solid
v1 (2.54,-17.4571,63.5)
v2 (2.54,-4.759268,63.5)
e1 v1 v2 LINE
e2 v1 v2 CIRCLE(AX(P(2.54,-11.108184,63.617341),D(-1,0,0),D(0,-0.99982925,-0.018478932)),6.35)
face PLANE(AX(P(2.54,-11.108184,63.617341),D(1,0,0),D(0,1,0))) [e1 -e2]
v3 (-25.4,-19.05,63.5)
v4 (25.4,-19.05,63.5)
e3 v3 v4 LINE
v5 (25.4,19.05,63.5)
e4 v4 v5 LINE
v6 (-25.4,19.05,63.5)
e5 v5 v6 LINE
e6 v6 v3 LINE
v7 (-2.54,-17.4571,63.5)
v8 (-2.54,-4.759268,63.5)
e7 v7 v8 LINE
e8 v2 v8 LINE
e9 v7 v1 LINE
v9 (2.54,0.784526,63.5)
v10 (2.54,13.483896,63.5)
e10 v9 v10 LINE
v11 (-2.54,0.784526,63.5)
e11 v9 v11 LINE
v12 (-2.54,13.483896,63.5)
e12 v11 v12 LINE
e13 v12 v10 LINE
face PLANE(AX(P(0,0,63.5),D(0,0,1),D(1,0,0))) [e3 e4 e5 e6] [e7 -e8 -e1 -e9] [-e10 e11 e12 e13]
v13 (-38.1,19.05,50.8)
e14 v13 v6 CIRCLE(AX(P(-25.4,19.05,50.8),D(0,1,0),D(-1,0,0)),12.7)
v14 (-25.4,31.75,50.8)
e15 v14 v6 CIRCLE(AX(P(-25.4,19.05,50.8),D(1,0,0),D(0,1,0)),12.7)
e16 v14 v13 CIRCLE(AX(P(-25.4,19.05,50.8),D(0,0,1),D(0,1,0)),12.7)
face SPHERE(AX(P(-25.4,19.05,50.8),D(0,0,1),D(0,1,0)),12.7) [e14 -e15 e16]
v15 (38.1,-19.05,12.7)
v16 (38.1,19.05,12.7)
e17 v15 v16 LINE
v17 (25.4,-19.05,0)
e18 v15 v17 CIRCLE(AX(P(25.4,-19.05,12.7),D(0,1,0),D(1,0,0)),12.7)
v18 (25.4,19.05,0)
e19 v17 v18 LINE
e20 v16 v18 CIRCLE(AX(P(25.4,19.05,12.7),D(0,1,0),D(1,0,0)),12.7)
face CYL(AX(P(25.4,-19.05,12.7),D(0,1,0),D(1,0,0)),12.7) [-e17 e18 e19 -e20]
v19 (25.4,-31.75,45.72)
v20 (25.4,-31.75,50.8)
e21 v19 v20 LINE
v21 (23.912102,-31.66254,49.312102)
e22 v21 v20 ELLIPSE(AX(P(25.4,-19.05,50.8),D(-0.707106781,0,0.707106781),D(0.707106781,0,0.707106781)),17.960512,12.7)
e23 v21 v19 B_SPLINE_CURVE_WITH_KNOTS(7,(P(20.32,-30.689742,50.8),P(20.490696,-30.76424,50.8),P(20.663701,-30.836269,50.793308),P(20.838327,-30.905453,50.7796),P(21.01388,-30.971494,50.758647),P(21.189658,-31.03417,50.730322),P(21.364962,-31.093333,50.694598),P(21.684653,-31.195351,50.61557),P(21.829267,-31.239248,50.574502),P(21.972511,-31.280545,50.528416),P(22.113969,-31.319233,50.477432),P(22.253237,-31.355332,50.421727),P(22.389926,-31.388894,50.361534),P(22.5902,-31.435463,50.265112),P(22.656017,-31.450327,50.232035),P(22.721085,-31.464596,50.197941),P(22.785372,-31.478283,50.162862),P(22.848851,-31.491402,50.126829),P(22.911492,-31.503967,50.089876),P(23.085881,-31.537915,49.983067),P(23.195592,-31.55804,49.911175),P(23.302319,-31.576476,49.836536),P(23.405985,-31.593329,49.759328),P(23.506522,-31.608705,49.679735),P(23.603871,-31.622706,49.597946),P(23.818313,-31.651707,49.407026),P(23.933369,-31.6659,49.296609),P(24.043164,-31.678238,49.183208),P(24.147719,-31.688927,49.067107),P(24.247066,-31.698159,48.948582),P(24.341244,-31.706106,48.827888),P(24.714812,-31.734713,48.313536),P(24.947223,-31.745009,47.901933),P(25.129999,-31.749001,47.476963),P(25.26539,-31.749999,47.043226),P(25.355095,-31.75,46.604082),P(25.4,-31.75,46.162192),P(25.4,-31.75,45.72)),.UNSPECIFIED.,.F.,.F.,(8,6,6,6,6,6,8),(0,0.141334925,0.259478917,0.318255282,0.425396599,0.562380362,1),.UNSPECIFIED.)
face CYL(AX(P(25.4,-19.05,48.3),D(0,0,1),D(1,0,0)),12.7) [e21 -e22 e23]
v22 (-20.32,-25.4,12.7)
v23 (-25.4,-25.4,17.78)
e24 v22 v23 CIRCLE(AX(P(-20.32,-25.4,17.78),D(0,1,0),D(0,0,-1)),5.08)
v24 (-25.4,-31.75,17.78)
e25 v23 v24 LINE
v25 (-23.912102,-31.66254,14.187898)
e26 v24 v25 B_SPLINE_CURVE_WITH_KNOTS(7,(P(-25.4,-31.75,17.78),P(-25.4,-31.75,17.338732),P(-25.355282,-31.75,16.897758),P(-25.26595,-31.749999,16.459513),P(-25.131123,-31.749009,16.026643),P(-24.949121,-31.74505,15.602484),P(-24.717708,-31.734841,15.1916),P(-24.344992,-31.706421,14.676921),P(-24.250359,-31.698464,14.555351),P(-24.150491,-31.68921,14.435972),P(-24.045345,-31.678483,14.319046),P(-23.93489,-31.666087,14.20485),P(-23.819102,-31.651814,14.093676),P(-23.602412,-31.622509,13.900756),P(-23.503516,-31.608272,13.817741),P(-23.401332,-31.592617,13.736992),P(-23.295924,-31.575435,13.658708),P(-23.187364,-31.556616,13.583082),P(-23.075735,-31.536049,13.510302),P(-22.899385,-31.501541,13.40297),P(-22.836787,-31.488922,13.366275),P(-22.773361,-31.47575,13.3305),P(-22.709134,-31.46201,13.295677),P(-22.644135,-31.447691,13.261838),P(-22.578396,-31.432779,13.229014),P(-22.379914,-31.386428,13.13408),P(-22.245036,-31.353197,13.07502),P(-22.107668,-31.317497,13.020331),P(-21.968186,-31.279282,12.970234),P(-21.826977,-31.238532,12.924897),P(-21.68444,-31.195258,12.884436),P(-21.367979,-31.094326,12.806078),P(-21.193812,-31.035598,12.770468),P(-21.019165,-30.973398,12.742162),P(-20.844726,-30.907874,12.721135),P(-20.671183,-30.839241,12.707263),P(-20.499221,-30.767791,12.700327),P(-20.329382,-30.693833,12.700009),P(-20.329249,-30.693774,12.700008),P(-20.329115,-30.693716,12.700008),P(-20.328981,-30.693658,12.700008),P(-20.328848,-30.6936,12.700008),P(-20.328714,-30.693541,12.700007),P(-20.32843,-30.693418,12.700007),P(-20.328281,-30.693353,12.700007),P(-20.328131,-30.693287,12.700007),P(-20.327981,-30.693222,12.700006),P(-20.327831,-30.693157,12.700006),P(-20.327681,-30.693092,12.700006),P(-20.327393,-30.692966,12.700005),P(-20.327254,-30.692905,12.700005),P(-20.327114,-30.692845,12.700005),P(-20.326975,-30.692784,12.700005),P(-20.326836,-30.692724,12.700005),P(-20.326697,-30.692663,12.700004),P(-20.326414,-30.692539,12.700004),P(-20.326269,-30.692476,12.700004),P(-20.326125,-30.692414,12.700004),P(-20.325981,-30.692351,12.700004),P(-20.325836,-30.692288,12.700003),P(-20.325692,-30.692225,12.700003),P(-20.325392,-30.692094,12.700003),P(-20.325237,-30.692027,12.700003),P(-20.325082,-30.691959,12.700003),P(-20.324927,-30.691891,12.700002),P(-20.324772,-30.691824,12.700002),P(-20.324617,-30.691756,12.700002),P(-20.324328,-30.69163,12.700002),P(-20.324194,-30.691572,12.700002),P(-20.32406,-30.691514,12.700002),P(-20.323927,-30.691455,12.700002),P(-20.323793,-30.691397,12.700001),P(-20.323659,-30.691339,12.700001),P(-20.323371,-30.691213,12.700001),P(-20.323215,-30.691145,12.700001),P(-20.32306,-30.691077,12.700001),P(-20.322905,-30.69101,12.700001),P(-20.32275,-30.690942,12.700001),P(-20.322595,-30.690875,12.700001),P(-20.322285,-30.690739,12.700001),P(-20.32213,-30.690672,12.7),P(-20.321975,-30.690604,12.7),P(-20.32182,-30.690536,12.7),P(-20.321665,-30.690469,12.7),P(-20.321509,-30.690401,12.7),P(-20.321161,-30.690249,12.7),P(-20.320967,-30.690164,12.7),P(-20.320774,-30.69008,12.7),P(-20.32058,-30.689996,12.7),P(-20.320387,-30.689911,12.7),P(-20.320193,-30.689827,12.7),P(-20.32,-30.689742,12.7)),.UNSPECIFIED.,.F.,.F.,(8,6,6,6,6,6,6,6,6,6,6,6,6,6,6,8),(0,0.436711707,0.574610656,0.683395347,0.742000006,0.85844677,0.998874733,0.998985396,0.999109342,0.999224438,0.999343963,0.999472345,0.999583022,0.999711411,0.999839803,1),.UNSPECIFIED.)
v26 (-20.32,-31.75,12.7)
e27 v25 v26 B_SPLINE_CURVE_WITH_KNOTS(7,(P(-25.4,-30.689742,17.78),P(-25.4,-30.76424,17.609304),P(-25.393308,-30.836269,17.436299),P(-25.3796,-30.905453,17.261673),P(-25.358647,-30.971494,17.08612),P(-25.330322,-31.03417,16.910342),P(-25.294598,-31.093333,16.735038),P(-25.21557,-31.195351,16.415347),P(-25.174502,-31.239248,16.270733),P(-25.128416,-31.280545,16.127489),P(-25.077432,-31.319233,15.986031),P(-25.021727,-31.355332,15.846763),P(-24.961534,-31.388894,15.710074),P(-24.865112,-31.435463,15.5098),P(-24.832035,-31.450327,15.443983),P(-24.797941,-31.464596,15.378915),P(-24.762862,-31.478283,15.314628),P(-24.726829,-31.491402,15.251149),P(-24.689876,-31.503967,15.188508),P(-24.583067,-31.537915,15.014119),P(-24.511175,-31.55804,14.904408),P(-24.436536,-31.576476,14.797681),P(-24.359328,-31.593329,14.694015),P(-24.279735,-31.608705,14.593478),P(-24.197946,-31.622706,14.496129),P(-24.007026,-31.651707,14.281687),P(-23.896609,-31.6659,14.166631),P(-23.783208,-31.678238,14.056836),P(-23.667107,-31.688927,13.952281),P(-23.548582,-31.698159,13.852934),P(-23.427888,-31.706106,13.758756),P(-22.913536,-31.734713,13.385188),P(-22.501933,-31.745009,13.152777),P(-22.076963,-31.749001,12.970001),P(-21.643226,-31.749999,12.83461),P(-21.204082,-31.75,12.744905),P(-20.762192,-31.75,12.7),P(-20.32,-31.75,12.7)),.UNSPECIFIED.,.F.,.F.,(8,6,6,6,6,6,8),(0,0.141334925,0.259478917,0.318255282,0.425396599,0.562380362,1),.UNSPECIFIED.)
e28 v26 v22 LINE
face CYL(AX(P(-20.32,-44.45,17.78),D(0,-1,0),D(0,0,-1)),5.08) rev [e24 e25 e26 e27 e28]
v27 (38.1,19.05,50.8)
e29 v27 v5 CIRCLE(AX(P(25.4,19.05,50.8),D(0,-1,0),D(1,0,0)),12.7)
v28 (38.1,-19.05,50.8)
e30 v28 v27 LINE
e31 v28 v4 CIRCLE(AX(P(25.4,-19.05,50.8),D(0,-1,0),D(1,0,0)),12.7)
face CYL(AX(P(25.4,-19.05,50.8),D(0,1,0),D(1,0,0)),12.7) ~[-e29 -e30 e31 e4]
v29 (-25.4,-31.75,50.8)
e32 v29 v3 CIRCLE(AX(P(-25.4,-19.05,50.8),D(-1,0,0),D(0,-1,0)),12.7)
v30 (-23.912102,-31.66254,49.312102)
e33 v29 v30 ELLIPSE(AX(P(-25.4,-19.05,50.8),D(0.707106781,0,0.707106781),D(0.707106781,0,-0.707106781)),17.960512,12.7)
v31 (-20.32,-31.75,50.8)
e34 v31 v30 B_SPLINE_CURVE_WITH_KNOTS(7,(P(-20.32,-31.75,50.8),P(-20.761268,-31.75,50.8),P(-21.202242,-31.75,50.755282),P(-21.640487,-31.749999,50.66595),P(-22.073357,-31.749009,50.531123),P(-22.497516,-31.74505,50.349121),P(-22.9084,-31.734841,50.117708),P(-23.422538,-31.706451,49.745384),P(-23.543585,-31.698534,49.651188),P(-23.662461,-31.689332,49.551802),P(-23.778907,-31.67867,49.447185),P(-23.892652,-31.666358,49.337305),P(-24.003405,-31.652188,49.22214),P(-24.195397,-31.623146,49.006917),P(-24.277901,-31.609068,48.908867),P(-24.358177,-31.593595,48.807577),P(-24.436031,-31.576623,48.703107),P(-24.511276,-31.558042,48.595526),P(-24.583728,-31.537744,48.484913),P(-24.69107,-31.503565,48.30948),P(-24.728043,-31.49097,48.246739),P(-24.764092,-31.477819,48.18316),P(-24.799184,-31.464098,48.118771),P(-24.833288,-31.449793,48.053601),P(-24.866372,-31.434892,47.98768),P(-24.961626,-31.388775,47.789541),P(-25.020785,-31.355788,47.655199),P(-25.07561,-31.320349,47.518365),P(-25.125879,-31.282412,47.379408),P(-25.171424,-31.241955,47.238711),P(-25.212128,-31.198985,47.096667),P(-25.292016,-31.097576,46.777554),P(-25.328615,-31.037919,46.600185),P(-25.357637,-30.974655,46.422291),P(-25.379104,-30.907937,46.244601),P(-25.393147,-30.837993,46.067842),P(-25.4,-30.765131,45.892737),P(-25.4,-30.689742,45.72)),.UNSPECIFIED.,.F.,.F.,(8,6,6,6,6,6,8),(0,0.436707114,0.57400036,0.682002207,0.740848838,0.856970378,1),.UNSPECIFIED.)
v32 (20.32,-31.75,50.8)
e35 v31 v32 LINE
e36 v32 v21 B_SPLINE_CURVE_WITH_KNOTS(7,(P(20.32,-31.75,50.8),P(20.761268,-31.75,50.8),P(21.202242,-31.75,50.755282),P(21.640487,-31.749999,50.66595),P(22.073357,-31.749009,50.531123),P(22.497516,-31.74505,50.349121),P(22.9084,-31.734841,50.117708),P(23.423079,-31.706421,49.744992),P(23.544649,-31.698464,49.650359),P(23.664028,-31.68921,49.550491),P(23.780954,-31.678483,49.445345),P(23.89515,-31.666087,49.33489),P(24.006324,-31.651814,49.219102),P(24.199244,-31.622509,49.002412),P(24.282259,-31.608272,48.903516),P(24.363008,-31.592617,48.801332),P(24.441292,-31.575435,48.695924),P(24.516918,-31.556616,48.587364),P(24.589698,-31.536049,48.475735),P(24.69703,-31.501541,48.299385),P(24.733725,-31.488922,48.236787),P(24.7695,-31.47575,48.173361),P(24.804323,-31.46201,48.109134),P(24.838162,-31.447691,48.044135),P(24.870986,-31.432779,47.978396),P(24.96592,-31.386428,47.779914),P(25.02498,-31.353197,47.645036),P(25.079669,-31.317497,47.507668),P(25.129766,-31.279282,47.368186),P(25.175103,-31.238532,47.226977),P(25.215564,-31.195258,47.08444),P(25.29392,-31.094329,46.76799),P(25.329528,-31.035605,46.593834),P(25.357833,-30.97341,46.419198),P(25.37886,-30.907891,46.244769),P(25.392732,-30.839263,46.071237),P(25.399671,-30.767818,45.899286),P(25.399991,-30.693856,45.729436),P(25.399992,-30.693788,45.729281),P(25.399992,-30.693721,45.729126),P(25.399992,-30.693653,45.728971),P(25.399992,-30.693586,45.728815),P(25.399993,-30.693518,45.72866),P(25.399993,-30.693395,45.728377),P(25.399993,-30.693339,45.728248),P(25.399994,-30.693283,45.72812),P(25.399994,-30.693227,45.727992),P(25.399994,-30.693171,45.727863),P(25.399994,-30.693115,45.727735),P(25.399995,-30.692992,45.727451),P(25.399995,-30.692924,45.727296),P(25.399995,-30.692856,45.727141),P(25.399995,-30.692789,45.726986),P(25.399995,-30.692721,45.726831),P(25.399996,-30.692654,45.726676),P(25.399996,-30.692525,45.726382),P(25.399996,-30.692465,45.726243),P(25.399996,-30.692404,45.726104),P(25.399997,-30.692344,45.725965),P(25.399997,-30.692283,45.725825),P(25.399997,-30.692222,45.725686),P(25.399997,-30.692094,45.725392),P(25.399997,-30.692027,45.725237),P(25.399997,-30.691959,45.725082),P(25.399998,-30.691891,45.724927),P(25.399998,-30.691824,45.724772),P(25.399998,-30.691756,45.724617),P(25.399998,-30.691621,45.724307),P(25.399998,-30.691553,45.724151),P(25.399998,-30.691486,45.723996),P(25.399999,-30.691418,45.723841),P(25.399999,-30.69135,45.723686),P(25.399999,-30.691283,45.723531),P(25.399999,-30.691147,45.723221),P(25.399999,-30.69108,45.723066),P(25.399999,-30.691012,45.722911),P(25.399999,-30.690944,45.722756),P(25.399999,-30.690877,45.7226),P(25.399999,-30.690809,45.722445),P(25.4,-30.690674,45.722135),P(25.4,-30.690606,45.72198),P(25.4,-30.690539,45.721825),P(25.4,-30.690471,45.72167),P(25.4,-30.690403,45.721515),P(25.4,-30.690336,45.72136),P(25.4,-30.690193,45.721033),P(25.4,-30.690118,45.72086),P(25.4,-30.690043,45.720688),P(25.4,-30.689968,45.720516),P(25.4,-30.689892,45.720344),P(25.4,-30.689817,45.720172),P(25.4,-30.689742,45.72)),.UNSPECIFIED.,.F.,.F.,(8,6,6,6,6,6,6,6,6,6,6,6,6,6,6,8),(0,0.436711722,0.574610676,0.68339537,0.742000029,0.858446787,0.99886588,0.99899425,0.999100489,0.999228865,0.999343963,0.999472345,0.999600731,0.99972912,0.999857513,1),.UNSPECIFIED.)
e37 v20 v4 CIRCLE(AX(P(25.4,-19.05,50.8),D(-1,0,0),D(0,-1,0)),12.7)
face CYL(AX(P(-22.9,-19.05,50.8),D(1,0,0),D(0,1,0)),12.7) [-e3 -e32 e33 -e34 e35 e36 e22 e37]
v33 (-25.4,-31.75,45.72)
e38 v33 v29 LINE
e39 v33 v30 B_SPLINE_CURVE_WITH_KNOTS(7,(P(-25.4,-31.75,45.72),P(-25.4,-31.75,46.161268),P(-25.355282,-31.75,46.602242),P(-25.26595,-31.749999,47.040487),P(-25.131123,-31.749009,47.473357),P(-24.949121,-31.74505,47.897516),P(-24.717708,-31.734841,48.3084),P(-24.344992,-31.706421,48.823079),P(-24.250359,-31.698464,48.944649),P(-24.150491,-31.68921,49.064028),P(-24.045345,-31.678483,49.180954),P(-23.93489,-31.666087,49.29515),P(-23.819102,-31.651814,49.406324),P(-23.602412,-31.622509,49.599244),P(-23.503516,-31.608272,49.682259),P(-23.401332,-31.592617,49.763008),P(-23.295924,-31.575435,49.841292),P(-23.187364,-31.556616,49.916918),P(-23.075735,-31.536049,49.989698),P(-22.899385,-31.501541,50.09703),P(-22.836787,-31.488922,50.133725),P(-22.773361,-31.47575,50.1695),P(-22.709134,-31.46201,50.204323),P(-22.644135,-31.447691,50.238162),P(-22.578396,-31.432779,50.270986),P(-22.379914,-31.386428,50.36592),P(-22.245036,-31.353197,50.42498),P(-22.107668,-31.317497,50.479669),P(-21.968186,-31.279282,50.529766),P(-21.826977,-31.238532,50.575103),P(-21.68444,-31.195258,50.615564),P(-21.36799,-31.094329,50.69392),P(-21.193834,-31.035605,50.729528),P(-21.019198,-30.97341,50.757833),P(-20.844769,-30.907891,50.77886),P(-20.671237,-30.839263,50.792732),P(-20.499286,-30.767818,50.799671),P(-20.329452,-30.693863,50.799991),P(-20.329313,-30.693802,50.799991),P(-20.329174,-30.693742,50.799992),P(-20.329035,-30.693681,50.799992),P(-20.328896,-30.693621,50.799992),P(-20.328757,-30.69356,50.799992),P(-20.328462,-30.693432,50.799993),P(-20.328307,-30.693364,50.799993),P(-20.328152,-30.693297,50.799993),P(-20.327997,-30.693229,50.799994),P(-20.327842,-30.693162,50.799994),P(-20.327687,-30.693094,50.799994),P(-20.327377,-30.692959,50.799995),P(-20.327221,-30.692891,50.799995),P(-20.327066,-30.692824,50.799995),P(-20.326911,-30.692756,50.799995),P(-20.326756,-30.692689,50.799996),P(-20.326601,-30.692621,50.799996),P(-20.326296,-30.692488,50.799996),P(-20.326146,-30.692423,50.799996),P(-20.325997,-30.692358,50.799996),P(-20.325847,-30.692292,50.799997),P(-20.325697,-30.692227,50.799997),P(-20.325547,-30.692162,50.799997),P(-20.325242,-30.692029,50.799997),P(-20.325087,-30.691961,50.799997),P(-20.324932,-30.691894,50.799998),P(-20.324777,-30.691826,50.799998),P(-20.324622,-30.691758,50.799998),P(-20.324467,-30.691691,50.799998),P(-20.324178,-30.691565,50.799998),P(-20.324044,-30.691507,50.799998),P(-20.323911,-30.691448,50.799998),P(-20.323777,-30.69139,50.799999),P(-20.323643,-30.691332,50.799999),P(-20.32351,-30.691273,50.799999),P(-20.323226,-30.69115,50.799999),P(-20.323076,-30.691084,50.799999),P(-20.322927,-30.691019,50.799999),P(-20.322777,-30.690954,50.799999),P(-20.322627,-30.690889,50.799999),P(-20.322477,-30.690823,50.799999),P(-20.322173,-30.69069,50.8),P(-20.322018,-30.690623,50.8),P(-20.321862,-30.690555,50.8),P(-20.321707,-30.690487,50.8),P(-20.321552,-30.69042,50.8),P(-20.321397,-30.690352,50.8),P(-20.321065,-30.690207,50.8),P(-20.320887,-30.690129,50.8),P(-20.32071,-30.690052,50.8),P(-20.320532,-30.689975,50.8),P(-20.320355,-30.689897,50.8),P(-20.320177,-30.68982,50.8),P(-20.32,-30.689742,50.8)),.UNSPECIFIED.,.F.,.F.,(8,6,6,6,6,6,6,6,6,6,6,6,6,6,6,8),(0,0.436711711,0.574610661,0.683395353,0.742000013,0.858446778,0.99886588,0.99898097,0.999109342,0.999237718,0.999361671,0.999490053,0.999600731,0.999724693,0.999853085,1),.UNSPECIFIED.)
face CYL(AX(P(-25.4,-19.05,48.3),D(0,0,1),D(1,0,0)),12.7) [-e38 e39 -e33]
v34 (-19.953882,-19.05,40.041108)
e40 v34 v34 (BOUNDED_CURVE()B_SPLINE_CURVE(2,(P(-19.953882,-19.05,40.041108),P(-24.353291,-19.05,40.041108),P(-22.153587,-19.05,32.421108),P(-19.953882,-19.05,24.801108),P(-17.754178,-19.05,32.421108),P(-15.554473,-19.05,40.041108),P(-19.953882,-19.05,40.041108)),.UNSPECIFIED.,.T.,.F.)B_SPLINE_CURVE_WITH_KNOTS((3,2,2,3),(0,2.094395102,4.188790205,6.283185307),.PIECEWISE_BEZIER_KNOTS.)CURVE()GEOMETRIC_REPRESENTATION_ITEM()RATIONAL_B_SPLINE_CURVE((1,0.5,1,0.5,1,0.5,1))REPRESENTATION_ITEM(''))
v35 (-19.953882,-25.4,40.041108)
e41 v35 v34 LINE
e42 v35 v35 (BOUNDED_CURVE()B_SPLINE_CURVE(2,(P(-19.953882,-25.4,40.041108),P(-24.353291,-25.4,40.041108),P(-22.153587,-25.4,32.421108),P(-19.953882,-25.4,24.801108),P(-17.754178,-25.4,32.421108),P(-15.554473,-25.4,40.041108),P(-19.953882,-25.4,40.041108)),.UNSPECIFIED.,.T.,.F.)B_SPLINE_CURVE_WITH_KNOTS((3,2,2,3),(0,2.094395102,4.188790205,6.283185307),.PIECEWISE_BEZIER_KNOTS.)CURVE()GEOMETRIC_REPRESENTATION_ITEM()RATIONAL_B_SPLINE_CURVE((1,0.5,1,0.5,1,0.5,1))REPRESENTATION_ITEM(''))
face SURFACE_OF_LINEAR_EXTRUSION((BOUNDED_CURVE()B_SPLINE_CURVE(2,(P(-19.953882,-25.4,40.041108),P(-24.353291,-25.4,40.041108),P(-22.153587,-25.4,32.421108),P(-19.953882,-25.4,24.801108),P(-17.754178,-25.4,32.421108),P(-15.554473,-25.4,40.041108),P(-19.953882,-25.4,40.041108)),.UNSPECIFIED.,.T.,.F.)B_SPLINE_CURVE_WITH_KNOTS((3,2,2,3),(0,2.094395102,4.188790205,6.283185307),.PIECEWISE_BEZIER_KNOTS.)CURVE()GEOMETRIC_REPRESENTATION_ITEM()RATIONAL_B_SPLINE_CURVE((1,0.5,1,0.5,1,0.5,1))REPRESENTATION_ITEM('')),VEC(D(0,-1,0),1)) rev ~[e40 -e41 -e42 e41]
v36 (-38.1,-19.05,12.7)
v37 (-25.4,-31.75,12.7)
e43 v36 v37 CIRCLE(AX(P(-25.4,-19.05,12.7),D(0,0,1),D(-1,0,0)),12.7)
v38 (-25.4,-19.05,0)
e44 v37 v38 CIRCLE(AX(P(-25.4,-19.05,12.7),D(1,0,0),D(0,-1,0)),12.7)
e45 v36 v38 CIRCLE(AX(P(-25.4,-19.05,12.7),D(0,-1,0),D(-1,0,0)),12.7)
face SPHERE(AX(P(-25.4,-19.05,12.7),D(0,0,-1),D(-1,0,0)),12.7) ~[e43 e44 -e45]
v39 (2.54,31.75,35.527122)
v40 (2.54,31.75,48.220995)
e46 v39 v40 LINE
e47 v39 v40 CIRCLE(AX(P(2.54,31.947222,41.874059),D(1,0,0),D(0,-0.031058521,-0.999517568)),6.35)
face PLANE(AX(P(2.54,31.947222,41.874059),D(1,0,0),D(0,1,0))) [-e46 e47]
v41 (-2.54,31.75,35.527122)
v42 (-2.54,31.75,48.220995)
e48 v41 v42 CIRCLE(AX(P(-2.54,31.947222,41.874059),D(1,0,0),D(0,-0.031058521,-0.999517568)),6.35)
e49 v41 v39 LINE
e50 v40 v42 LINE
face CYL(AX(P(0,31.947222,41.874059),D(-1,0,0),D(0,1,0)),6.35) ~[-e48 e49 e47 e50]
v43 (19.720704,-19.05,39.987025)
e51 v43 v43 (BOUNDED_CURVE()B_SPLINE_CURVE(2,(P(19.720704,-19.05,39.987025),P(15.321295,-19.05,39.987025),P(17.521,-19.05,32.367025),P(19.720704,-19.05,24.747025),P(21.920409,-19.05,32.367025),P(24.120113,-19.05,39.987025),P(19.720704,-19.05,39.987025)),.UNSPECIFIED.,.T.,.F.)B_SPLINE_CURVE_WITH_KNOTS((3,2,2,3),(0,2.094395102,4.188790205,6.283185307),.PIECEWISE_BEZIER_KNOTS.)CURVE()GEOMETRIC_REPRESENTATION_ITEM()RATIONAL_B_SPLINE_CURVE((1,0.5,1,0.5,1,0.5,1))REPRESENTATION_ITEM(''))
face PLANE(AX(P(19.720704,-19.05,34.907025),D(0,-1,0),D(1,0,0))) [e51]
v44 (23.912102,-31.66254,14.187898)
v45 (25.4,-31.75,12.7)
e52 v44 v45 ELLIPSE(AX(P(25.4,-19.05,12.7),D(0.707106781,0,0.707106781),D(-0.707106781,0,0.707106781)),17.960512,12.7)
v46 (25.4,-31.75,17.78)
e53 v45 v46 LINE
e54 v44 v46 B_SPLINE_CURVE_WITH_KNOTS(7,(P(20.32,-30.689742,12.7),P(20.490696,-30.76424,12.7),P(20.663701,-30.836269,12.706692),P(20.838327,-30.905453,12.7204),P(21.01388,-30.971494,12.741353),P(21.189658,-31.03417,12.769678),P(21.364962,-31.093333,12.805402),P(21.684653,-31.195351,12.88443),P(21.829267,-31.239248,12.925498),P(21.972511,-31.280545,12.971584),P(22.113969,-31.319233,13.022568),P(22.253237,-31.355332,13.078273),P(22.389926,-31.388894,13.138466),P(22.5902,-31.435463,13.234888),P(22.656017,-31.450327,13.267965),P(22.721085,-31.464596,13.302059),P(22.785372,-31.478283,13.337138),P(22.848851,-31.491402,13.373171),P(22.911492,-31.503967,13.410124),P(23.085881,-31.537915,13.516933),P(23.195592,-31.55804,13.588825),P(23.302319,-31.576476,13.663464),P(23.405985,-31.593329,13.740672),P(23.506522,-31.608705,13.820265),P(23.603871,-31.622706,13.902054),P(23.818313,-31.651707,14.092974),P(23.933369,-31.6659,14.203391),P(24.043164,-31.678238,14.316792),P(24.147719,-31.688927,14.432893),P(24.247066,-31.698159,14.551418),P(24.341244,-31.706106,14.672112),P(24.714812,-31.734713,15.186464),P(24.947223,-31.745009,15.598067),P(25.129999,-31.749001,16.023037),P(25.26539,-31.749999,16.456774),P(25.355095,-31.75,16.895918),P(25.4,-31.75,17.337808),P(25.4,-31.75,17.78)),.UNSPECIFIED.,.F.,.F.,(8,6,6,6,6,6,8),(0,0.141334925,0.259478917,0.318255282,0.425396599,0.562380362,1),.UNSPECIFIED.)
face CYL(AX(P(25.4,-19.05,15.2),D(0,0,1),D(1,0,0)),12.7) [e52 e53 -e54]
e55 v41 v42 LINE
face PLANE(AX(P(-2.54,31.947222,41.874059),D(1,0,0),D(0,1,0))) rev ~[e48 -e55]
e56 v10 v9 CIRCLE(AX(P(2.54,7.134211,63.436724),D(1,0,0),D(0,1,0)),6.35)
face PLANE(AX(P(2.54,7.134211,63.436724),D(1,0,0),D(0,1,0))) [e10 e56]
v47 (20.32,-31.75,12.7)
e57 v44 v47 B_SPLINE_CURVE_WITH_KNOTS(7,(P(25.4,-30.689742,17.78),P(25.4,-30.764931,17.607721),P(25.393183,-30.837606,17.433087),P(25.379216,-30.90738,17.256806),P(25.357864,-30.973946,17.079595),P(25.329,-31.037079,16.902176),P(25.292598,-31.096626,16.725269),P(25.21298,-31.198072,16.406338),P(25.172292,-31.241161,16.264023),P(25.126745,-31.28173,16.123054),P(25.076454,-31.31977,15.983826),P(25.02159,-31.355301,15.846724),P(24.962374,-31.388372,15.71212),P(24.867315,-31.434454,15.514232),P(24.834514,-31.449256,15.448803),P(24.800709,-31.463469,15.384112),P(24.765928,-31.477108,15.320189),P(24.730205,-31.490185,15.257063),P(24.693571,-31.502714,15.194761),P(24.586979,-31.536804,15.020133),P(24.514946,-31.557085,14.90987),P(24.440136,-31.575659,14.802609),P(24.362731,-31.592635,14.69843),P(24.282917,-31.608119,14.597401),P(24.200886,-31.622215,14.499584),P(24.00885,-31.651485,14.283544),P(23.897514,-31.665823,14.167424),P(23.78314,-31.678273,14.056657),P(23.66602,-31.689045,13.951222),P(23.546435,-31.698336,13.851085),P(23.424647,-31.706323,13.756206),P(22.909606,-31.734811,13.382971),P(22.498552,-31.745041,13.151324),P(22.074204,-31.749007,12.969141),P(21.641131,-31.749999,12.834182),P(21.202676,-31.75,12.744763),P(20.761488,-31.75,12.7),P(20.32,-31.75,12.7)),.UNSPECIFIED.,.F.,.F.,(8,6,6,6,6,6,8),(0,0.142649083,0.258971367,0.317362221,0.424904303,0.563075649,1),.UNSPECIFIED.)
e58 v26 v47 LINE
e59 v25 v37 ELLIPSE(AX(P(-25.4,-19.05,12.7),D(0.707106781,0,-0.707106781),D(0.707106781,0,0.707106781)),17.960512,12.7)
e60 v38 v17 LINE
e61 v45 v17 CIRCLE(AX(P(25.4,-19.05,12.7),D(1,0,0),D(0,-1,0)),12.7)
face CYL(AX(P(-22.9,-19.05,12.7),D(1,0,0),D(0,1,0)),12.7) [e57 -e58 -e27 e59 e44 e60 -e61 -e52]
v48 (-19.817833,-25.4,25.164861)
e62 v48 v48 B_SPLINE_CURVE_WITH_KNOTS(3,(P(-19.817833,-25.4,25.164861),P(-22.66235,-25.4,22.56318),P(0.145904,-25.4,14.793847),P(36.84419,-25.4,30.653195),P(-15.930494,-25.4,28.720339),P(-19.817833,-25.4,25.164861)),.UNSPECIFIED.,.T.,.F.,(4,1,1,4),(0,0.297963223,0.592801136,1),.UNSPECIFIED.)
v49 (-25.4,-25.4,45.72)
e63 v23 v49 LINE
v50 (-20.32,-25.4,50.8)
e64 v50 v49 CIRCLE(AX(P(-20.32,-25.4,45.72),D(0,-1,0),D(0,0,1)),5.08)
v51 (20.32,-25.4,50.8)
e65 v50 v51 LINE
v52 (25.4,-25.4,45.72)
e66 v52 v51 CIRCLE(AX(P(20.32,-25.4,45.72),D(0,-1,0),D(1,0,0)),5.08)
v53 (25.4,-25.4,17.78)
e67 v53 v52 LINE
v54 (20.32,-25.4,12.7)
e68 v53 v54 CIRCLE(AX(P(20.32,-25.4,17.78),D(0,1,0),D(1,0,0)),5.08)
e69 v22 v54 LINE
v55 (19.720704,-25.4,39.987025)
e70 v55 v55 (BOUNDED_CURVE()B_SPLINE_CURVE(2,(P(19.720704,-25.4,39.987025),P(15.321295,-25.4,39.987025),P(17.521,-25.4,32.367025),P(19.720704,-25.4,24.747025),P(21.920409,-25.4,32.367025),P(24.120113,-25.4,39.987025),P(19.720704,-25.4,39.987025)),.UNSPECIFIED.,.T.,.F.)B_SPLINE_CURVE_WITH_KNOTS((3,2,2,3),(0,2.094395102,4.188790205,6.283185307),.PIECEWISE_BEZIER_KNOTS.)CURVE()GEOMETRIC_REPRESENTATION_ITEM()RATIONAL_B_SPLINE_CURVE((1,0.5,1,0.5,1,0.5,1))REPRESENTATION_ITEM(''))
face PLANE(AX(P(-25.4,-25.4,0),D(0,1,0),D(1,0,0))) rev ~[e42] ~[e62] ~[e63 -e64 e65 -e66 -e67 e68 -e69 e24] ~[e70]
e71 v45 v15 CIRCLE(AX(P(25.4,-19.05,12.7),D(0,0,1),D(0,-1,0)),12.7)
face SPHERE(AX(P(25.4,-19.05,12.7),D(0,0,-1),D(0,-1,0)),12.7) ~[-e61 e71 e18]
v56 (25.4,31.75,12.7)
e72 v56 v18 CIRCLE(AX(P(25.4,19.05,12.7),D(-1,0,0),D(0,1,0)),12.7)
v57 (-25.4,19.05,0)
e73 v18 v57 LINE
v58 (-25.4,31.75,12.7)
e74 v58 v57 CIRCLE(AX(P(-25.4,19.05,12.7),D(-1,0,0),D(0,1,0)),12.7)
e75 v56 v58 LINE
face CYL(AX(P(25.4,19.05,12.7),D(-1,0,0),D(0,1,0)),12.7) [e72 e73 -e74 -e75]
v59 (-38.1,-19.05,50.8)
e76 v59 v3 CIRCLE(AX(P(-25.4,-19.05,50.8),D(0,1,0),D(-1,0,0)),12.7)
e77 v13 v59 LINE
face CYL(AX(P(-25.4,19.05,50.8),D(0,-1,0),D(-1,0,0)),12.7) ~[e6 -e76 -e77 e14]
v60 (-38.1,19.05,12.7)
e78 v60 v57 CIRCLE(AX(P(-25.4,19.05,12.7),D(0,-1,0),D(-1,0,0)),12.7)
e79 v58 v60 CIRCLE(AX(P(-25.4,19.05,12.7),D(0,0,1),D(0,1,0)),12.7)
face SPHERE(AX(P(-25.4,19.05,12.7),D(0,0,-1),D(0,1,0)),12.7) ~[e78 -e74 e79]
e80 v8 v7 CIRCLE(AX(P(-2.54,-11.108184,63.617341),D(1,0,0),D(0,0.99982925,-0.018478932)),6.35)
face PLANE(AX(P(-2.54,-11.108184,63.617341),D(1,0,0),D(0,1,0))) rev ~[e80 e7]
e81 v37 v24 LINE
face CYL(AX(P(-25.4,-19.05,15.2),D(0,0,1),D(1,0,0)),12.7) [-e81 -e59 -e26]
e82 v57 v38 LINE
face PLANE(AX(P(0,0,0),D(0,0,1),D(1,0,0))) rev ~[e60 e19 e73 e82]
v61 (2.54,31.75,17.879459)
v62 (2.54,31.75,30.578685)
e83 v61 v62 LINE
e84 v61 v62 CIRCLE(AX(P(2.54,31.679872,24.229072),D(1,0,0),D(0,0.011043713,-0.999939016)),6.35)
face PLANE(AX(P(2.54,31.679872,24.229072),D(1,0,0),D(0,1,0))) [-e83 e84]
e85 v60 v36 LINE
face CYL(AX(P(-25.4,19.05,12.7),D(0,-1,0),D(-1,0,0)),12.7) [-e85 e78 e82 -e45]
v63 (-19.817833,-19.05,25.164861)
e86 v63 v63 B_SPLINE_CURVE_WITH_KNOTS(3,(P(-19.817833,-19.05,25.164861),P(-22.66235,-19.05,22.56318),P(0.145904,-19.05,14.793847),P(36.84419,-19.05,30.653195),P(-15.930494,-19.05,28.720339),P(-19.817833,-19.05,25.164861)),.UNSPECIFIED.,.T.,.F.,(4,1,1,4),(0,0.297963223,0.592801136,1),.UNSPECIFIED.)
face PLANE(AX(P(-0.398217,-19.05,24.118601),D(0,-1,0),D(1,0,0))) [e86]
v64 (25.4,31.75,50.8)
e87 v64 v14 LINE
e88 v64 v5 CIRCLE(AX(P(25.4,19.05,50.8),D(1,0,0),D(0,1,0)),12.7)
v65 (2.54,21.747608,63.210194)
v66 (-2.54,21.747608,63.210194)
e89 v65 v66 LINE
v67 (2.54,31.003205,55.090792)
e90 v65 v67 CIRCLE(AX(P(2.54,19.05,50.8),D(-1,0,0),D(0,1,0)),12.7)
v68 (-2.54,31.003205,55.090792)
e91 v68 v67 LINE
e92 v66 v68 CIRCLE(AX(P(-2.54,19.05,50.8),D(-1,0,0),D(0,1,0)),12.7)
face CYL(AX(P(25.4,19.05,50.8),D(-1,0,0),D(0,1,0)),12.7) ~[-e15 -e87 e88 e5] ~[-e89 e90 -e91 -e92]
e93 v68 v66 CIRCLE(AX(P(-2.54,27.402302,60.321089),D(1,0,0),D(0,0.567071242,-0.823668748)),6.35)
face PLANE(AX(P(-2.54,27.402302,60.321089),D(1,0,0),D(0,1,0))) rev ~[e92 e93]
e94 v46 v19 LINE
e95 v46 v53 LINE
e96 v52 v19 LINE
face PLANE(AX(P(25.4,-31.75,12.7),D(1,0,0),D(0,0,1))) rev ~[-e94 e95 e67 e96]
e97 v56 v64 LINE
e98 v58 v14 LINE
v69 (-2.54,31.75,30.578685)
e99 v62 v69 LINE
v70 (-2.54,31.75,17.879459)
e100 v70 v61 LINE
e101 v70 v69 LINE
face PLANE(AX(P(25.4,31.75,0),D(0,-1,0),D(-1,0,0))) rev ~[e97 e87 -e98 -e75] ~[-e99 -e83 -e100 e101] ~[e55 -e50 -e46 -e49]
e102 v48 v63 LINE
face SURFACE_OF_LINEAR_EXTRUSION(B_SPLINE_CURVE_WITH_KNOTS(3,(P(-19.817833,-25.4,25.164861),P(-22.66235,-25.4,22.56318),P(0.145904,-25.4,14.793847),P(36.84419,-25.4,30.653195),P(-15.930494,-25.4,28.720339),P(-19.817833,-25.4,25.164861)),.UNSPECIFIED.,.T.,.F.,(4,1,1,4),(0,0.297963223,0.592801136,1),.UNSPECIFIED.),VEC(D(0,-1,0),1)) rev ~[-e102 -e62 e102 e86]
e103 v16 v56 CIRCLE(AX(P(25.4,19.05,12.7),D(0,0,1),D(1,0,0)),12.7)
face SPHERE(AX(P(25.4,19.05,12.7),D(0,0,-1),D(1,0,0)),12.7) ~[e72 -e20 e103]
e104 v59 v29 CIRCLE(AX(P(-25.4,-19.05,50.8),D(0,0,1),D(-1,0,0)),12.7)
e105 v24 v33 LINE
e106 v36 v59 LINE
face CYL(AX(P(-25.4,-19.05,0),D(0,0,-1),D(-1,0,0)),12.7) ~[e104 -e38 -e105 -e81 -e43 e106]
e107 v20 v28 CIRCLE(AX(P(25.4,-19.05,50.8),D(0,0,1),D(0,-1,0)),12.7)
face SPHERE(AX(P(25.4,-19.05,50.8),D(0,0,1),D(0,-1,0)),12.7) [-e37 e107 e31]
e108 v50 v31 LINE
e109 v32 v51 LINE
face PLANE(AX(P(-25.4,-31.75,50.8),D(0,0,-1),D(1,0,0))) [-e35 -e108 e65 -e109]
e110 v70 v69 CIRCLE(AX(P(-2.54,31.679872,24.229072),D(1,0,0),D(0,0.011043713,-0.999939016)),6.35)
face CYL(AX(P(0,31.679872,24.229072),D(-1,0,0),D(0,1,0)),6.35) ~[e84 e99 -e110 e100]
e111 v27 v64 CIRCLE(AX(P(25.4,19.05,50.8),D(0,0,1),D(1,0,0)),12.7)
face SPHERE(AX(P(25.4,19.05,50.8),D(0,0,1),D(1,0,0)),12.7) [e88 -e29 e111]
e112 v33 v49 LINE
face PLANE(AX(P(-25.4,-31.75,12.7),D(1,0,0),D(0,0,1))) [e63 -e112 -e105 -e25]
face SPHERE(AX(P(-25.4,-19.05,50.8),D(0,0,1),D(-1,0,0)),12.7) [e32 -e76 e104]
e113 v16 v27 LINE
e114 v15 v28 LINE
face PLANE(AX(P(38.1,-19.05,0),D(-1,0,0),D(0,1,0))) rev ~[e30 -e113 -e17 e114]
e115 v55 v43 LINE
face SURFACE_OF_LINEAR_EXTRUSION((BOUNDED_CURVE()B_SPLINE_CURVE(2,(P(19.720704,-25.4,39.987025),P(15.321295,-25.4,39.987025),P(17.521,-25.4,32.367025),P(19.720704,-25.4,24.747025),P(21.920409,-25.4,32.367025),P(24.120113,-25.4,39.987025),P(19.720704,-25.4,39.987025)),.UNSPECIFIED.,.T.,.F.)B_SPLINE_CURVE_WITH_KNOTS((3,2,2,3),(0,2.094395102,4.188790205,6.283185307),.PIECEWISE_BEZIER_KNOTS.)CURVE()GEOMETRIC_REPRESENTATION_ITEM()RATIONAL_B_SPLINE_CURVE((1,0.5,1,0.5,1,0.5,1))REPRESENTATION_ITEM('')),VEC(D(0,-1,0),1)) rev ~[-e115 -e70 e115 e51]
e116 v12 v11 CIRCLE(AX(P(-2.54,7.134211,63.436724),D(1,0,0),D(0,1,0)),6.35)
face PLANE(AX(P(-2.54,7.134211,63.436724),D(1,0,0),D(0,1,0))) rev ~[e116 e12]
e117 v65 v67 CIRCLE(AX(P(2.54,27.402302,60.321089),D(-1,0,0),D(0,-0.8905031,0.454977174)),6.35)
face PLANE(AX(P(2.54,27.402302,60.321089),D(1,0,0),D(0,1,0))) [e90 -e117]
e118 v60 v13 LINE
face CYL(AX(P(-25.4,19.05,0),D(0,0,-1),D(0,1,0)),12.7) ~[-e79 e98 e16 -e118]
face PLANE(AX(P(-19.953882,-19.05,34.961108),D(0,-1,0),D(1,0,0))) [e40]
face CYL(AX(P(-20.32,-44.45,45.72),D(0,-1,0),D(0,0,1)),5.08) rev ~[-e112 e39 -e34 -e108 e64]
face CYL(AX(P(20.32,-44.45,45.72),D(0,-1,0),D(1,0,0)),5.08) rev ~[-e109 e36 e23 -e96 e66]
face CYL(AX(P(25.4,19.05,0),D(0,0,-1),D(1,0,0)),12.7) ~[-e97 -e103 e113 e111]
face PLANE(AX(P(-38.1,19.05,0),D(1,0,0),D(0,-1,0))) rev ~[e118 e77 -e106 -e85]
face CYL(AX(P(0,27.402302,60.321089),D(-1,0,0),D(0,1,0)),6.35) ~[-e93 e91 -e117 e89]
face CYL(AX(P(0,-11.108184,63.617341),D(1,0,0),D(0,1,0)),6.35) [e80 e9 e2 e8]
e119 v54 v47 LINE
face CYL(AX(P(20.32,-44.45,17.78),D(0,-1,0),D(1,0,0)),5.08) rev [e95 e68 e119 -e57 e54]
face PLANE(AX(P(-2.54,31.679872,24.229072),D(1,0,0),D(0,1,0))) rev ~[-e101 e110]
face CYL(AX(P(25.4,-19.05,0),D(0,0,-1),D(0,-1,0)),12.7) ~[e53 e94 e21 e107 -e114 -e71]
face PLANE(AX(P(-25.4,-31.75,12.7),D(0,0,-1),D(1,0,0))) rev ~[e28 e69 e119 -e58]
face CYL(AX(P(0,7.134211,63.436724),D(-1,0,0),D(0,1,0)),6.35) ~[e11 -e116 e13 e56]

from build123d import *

# Parameters (mm, degrees)
F1_DEPTH       = 63.5
F2_R           = 12.7
F3_DEPTH       = 6.35
F4_T4_DEPTH    = 19.05
F4_S5_R        = 12.7
F4_T6_DEPTH    = 12
F4_S7_R        = 12.7
F4_T8_DEPTH    = 12
F4_T12_DEPTH   = 19.05
F4_S13_R       = 12.7
F4_T14_DEPTH   = 12
F4_S15_R       = 12.7
F4_T16_DEPTH   = 12
F4_T20_DEPTH   = 19.05
F4_S21_R       = 12.7
F4_T22_DEPTH   = 12
F4_S23_R       = 12.7
F4_T24_DEPTH   = 12
F4_T28_DEPTH   = 31.75
F4_T33_DEPTH   = 19.05
F4_S34_R       = 12.7
F4_T35_DEPTH   = 12
F4_S36_R       = 12.7
F4_T37_DEPTH   = 12
F4_T41_DEPTH   = 19.05
F4_S42_R       = 12.7
F4_T43_DEPTH   = 12
F4_S44_R       = 12.7
F4_T45_DEPTH   = 12
F4_T49_DEPTH   = 19.05
F4_S50_R       = 12.7
F4_T51_DEPTH   = 12
F4_S52_R       = 12.7
F4_T53_DEPTH   = 12
F4_T57_DEPTH   = 31.75
F4_T62_DEPTH   = 19.05
F4_S63_R       = 12.7
F4_T64_DEPTH   = 12
F4_S65_R       = 12.7
F4_T66_DEPTH   = 12
F4_T70_DEPTH   = 19.05
F4_S71_R       = 12.7
F4_T72_DEPTH   = 12
F4_S73_R       = 12.7
F4_T74_DEPTH   = 12
F4_T78_DEPTH   = 19.05
F4_S79_R       = 12.7
F4_T80_DEPTH   = 12
F4_S81_R       = 12.7
F4_T82_DEPTH   = 12
F4_T86_DEPTH   = 31.75
F4_T91_DEPTH   = 19.05
F4_S92_R       = 12.7
F4_T93_DEPTH   = 12
F4_S94_R       = 12.7
F4_T95_DEPTH   = 12
F4_T99_DEPTH   = 19.05
F4_S100_R      = 12.7
F4_T101_DEPTH  = 12
F4_S102_R      = 12.7
F4_T103_DEPTH  = 12
F4_T107_DEPTH  = 19.05
F4_S108_R      = 12.7
F4_T109_DEPTH  = 12
F4_S110_R      = 12.7
F4_T111_DEPTH  = 12
F4_T115_DEPTH  = 31.75
F7_DEPTH       = 6.35
F9_DEPTH       = 6.35
F10_R          = 6.35
F11_DEPTH      = 2.54
F11_DEPTH_BACK = 2.54


# Not quite as in the source:
# - a fillet or chamfer that OpenCascade refuses, or shapes differently, is made with other operations: its cross-section is extruded or revolved along the edge and cut away or added


with BuildPart() as f1:
    # F0 (on Top) → F1 (new body)
    with BuildSketch(Plane.XY):
        with BuildLine():
            ThreePointArc((38.1, 19.05), (34.3802561211, 28.0302561211), (25.4, 31.75))
            Line((25.4, 31.75), (-25.4, 31.75))
            ThreePointArc((-25.4, 31.75), (-34.3802561211, 28.0302561211), (-38.1, 19.05))
            Line((-38.1, 19.05), (-38.1, -19.05))
            ThreePointArc((-38.1, -19.05), (-34.3802561211, -28.0302561211), (-25.4, -31.75))
            Line((-25.4, -31.75), (25.4, -31.75))
            ThreePointArc((25.4, -31.75), (34.3802561211, -28.0302561211), (38.1, -19.05))
            Line((38.1, -19.05), (38.1, 19.05))
        make_face()
    extrude(amount=F1_DEPTH)

    # F2
    f2_edges = [f1.edges().sort_by_distance(p)[0] for p in [
        (34.380256, 28.030256, 63.5),
        (0, 31.75, 63.5),
        (-34.380256, 28.030256, 63.5),
        (-38.1, 0, 63.5),
        (-34.380256, -28.030256, 63.5),
        (0, -31.75, 63.5),
        (34.380256, -28.030256, 63.5),
        (38.1, 0, 63.5),
        (34.380256, 28.030256, 0),
        (0, 31.75, 0),
        (-34.380256, 28.030256, 0),
        (-38.1, 0, 0),
        (-34.380256, -28.030256, 0),
        (0, -31.75, 0),
        (34.380256, -28.030256, 0),
        (38.1, 0, 0),
    ]]
    fillet(f2_edges, radius=F2_R)

    # F3 (cut): a face of the model
    f3_faces = [f1.faces().sort_by_distance(p)[0] for p in [
        (0, -31.75, 31.75),
    ]]
    extrude(f3_faces, amount=-F3_DEPTH, mode=Mode.SUBTRACT)

    # F4: fillet of radius 5.08 on 4 edges, made by hand


with BuildPart() as f4_tool2:
    # F4_s3 → F4_t4 (new body)
    with BuildSketch(Plane.XZ.offset(44.45)):
        with BuildLine():
            ThreePointArc((25.4, 17.78), (23.9121024484, 14.1878975516), (20.32, 12.7))
            Line((20.32, 12.7), (25.4, 12.7))
            Line((25.4, 12.7), (25.4, 17.78))
        make_face()
    extrude(amount=-F4_T4_DEPTH)

    # F4_s5 → F4_t6 (cut, symmetric)
    with BuildSketch(Plane.XY.offset(15.2)):
        with Locations((25.4, -19.05)):
            Circle(F4_S5_R)
    extrude(amount=F4_T6_DEPTH, both=True, mode=Mode.SUBTRACT)

    # F4_s7 → F4_t8 (intersect, symmetric)
    with BuildSketch(Plane.YZ.offset(22.9)):
        with Locations((-19.05, 12.7)):
            Circle(F4_S7_R)
    extrude(amount=F4_T8_DEPTH, both=True, mode=Mode.INTERSECT)


with BuildPart() as f1_1:
    add(f1.part)

    # F4_t1: union F4_tool2
    add(f4_tool2.part)


with BuildPart() as f4_tool10:
    # F4_s11 → F4_t12 (new body)
    with BuildSketch(Plane.XZ.offset(44.45)):
        with BuildLine():
            ThreePointArc((25.4, 17.78), (23.9121024484, 14.1878975516), (20.32, 12.7))
            Line((20.32, 12.7), (25.4, 12.7))
            Line((25.4, 12.7), (25.4, 17.78))
        make_face()
    extrude(amount=-F4_T12_DEPTH)

    # F4_s13 → F4_t14 (intersect, symmetric)
    with BuildSketch(Plane.XY.offset(15.2)):
        with Locations((25.4, -19.05)):
            Circle(F4_S13_R)
    extrude(amount=F4_T14_DEPTH, both=True, mode=Mode.INTERSECT)

    # F4_s15 → F4_t16 (cut, symmetric)
    with BuildSketch(Plane.YZ.offset(22.9)):
        with Locations((-19.05, 12.7)):
            Circle(F4_S15_R)
    extrude(amount=F4_T16_DEPTH, both=True, mode=Mode.SUBTRACT)


with BuildPart() as f1_2:
    add(f1_1.part)

    # F4_t9: union F4_tool10
    add(f4_tool10.part)


with BuildPart() as f4_tool18:
    # F4_s19 → F4_t20 (new body)
    with BuildSketch(Plane.XZ.offset(44.45)):
        with BuildLine():
            ThreePointArc((25.4, 17.78), (23.9121024484, 14.1878975516), (20.32, 12.7))
            Line((20.32, 12.7), (25.4, 12.7))
            Line((25.4, 12.7), (25.4, 17.78))
        make_face()
    extrude(amount=-F4_T20_DEPTH)

    # F4_s21 → F4_t22 (intersect, symmetric)
    with BuildSketch(Plane.XY.offset(15.2)):
        with Locations((25.4, -19.05)):
            Circle(F4_S21_R)
    extrude(amount=F4_T22_DEPTH, both=True, mode=Mode.INTERSECT)

    # F4_s23 → F4_t24 (intersect, symmetric)
    with BuildSketch(Plane.YZ.offset(22.9)):
        with Locations((-19.05, 12.7)):
            Circle(F4_S23_R)
    extrude(amount=F4_T24_DEPTH, both=True, mode=Mode.INTERSECT)


with BuildPart() as f1_3:
    add(f1_2.part)

    # F4_t17: union F4_tool18
    add(f4_tool18.part)


with BuildPart() as f4_tool26:
    # F4_s27 → F4_t28 (new body)
    with BuildSketch(Plane.XZ.offset(44.45)):
        with BuildLine():
            ThreePointArc((25.4, 17.78), (23.9121024484, 14.1878975516), (20.32, 12.7))
            Line((20.32, 12.7), (25.4, 12.7))
            Line((25.4, 12.7), (25.4, 17.78))
        make_face()
    extrude(amount=-F4_T28_DEPTH)

    split(bisect_by=Plane.XZ.offset(25.4), keep=Keep.BOTTOM)


with BuildPart() as f1_4:
    add(f1_3.part)

    # F4_t25: union F4_tool26
    add(f4_tool26.part)


with BuildPart() as f4_tool31:
    # F4_s32 → F4_t33 (new body)
    with BuildSketch(Plane.XZ.offset(44.45)):
        with BuildLine():
            ThreePointArc((25.4, 45.72), (23.9121024484, 49.3121024484), (20.32, 50.8))
            Line((20.32, 50.8), (25.4, 50.8))
            Line((25.4, 50.8), (25.4, 45.72))
        make_face()
    extrude(amount=-F4_T33_DEPTH)

    # F4_s34 → F4_t35 (cut, symmetric)
    with BuildSketch(Plane.XY.offset(48.3)):
        with Locations((25.4, -19.05)):
            Circle(F4_S34_R)
    extrude(amount=F4_T35_DEPTH, both=True, mode=Mode.SUBTRACT)

    # F4_s36 → F4_t37 (intersect, symmetric)
    with BuildSketch(Plane.YZ.offset(22.9)):
        with Locations((-19.05, 50.8)):
            Circle(F4_S36_R)
    extrude(amount=F4_T37_DEPTH, both=True, mode=Mode.INTERSECT)


with BuildPart() as f1_5:
    add(f1_4.part)

    # F4_t30: union F4_tool31
    add(f4_tool31.part)


with BuildPart() as f4_tool39:
    # F4_s40 → F4_t41 (new body)
    with BuildSketch(Plane.XZ.offset(44.45)):
        with BuildLine():
            ThreePointArc((25.4, 45.72), (23.9121024484, 49.3121024484), (20.32, 50.8))
            Line((20.32, 50.8), (25.4, 50.8))
            Line((25.4, 50.8), (25.4, 45.72))
        make_face()
    extrude(amount=-F4_T41_DEPTH)

    # F4_s42 → F4_t43 (intersect, symmetric)
    with BuildSketch(Plane.XY.offset(48.3)):
        with Locations((25.4, -19.05)):
            Circle(F4_S42_R)
    extrude(amount=F4_T43_DEPTH, both=True, mode=Mode.INTERSECT)

    # F4_s44 → F4_t45 (cut, symmetric)
    with BuildSketch(Plane.YZ.offset(22.9)):
        with Locations((-19.05, 50.8)):
            Circle(F4_S44_R)
    extrude(amount=F4_T45_DEPTH, both=True, mode=Mode.SUBTRACT)


with BuildPart() as f1_6:
    add(f1_5.part)

    # F4_t38: union F4_tool39
    add(f4_tool39.part)


with BuildPart() as f4_tool47:
    # F4_s48 → F4_t49 (new body)
    with BuildSketch(Plane.XZ.offset(44.45)):
        with BuildLine():
            ThreePointArc((25.4, 45.72), (23.9121024484, 49.3121024484), (20.32, 50.8))
            Line((20.32, 50.8), (25.4, 50.8))
            Line((25.4, 50.8), (25.4, 45.72))
        make_face()
    extrude(amount=-F4_T49_DEPTH)

    # F4_s50 → F4_t51 (intersect, symmetric)
    with BuildSketch(Plane.XY.offset(48.3)):
        with Locations((25.4, -19.05)):
            Circle(F4_S50_R)
    extrude(amount=F4_T51_DEPTH, both=True, mode=Mode.INTERSECT)

    # F4_s52 → F4_t53 (intersect, symmetric)
    with BuildSketch(Plane.YZ.offset(22.9)):
        with Locations((-19.05, 50.8)):
            Circle(F4_S52_R)
    extrude(amount=F4_T53_DEPTH, both=True, mode=Mode.INTERSECT)


with BuildPart() as f1_7:
    add(f1_6.part)

    # F4_t46: union F4_tool47
    add(f4_tool47.part)


with BuildPart() as f4_tool55:
    # F4_s56 → F4_t57 (new body)
    with BuildSketch(Plane.XZ.offset(44.45)):
        with BuildLine():
            ThreePointArc((25.4, 45.72), (23.9121024484, 49.3121024484), (20.32, 50.8))
            Line((20.32, 50.8), (25.4, 50.8))
            Line((25.4, 50.8), (25.4, 45.72))
        make_face()
    extrude(amount=-F4_T57_DEPTH)

    split(bisect_by=Plane.XZ.offset(25.4), keep=Keep.BOTTOM)


with BuildPart() as f1_8:
    add(f1_7.part)

    # F4_t54: union F4_tool55
    add(f4_tool55.part)


with BuildPart() as f4_tool60:
    # F4_s61 → F4_t62 (new body)
    with BuildSketch(Plane.XZ.offset(44.45)):
        with BuildLine():
            ThreePointArc((-20.32, 12.7), (-23.9121024484, 14.1878975516), (-25.4, 17.78))
            Line((-25.4, 17.78), (-25.4, 12.7))
            Line((-25.4, 12.7), (-20.32, 12.7))
        make_face()
    extrude(amount=-F4_T62_DEPTH)

    # F4_s63 → F4_t64 (cut, symmetric)
    with BuildSketch(Plane.YZ.offset(-22.9)):
        with Locations((-19.05, 12.7)):
            Circle(F4_S63_R)
    extrude(amount=F4_T64_DEPTH, both=True, mode=Mode.SUBTRACT)

    # F4_s65 → F4_t66 (intersect, symmetric)
    with BuildSketch(Plane.XY.offset(15.2)):
        with Locations((-25.4, -19.05)):
            Circle(F4_S65_R)
    extrude(amount=F4_T66_DEPTH, both=True, mode=Mode.INTERSECT)


with BuildPart() as f1_9:
    add(f1_8.part)

    # F4_t59: union F4_tool60
    add(f4_tool60.part)


with BuildPart() as f4_tool68:
    # F4_s69 → F4_t70 (new body)
    with BuildSketch(Plane.XZ.offset(44.45)):
        with BuildLine():
            ThreePointArc((-20.32, 12.7), (-23.9121024484, 14.1878975516), (-25.4, 17.78))
            Line((-25.4, 17.78), (-25.4, 12.7))
            Line((-25.4, 12.7), (-20.32, 12.7))
        make_face()
    extrude(amount=-F4_T70_DEPTH)

    # F4_s71 → F4_t72 (intersect, symmetric)
    with BuildSketch(Plane.YZ.offset(-22.9)):
        with Locations((-19.05, 12.7)):
            Circle(F4_S71_R)
    extrude(amount=F4_T72_DEPTH, both=True, mode=Mode.INTERSECT)

    # F4_s73 → F4_t74 (cut, symmetric)
    with BuildSketch(Plane.XY.offset(15.2)):
        with Locations((-25.4, -19.05)):
            Circle(F4_S73_R)
    extrude(amount=F4_T74_DEPTH, both=True, mode=Mode.SUBTRACT)


with BuildPart() as f1_10:
    add(f1_9.part)

    # F4_t67: union F4_tool68
    add(f4_tool68.part)


with BuildPart() as f4_tool76:
    # F4_s77 → F4_t78 (new body)
    with BuildSketch(Plane.XZ.offset(44.45)):
        with BuildLine():
            ThreePointArc((-20.32, 12.7), (-23.9121024484, 14.1878975516), (-25.4, 17.78))
            Line((-25.4, 17.78), (-25.4, 12.7))
            Line((-25.4, 12.7), (-20.32, 12.7))
        make_face()
    extrude(amount=-F4_T78_DEPTH)

    # F4_s79 → F4_t80 (intersect, symmetric)
    with BuildSketch(Plane.YZ.offset(-22.9)):
        with Locations((-19.05, 12.7)):
            Circle(F4_S79_R)
    extrude(amount=F4_T80_DEPTH, both=True, mode=Mode.INTERSECT)

    # F4_s81 → F4_t82 (intersect, symmetric)
    with BuildSketch(Plane.XY.offset(15.2)):
        with Locations((-25.4, -19.05)):
            Circle(F4_S81_R)
    extrude(amount=F4_T82_DEPTH, both=True, mode=Mode.INTERSECT)


with BuildPart() as f1_11:
    add(f1_10.part)

    # F4_t75: union F4_tool76
    add(f4_tool76.part)


with BuildPart() as f4_tool84:
    # F4_s85 → F4_t86 (new body)
    with BuildSketch(Plane.XZ.offset(44.45)):
        with BuildLine():
            ThreePointArc((-20.32, 12.7), (-23.9121024484, 14.1878975516), (-25.4, 17.78))
            Line((-25.4, 17.78), (-25.4, 12.7))
            Line((-25.4, 12.7), (-20.32, 12.7))
        make_face()
    extrude(amount=-F4_T86_DEPTH)

    split(bisect_by=Plane.XZ.offset(25.4), keep=Keep.BOTTOM)


with BuildPart() as f1_12:
    add(f1_11.part)

    # F4_t83: union F4_tool84
    add(f4_tool84.part)


with BuildPart() as f4_tool89:
    # F4_s90 → F4_t91 (new body)
    with BuildSketch(Plane.XZ.offset(44.45)):
        with BuildLine():
            ThreePointArc((-20.32, 50.8), (-23.9121024484, 49.3121024484), (-25.4, 45.72))
            Line((-25.4, 45.72), (-25.4, 50.8))
            Line((-25.4, 50.8), (-20.32, 50.8))
        make_face()
    extrude(amount=-F4_T91_DEPTH)

    # F4_s92 → F4_t93 (cut, symmetric)
    with BuildSketch(Plane.YZ.offset(-22.9)):
        with Locations((-19.05, 50.8)):
            Circle(F4_S92_R)
    extrude(amount=F4_T93_DEPTH, both=True, mode=Mode.SUBTRACT)

    # F4_s94 → F4_t95 (intersect, symmetric)
    with BuildSketch(Plane.XY.offset(48.3)):
        with Locations((-25.4, -19.05)):
            Circle(F4_S94_R)
    extrude(amount=F4_T95_DEPTH, both=True, mode=Mode.INTERSECT)


with BuildPart() as f1_13:
    add(f1_12.part)

    # F4_t88: union F4_tool89
    add(f4_tool89.part)


with BuildPart() as f4_tool97:
    # F4_s98 → F4_t99 (new body)
    with BuildSketch(Plane.XZ.offset(44.45)):
        with BuildLine():
            ThreePointArc((-20.32, 50.8), (-23.9121024484, 49.3121024484), (-25.4, 45.72))
            Line((-25.4, 45.72), (-25.4, 50.8))
            Line((-25.4, 50.8), (-20.32, 50.8))
        make_face()
    extrude(amount=-F4_T99_DEPTH)

    # F4_s100 → F4_t101 (intersect, symmetric)
    with BuildSketch(Plane.YZ.offset(-22.9)):
        with Locations((-19.05, 50.8)):
            Circle(F4_S100_R)
    extrude(amount=F4_T101_DEPTH, both=True, mode=Mode.INTERSECT)

    # F4_s102 → F4_t103 (cut, symmetric)
    with BuildSketch(Plane.XY.offset(48.3)):
        with Locations((-25.4, -19.05)):
            Circle(F4_S102_R)
    extrude(amount=F4_T103_DEPTH, both=True, mode=Mode.SUBTRACT)


with BuildPart() as f1_14:
    add(f1_13.part)

    # F4_t96: union F4_tool97
    add(f4_tool97.part)


with BuildPart() as f4_tool105:
    # F4_s106 → F4_t107 (new body)
    with BuildSketch(Plane.XZ.offset(44.45)):
        with BuildLine():
            ThreePointArc((-20.32, 50.8), (-23.9121024484, 49.3121024484), (-25.4, 45.72))
            Line((-25.4, 45.72), (-25.4, 50.8))
            Line((-25.4, 50.8), (-20.32, 50.8))
        make_face()
    extrude(amount=-F4_T107_DEPTH)

    # F4_s108 → F4_t109 (intersect, symmetric)
    with BuildSketch(Plane.YZ.offset(-22.9)):
        with Locations((-19.05, 50.8)):
            Circle(F4_S108_R)
    extrude(amount=F4_T109_DEPTH, both=True, mode=Mode.INTERSECT)

    # F4_s110 → F4_t111 (intersect, symmetric)
    with BuildSketch(Plane.XY.offset(48.3)):
        with Locations((-25.4, -19.05)):
            Circle(F4_S110_R)
    extrude(amount=F4_T111_DEPTH, both=True, mode=Mode.INTERSECT)


with BuildPart() as f1_15:
    add(f1_14.part)

    # F4_t104: union F4_tool105
    add(f4_tool105.part)


with BuildPart() as f4_tool113:
    # F4_s114 → F4_t115 (new body)
    with BuildSketch(Plane.XZ.offset(44.45)):
        with BuildLine():
            ThreePointArc((-20.32, 50.8), (-23.9121024484, 49.3121024484), (-25.4, 45.72))
            Line((-25.4, 45.72), (-25.4, 50.8))
            Line((-25.4, 50.8), (-20.32, 50.8))
        make_face()
    extrude(amount=-F4_T115_DEPTH)

    split(bisect_by=Plane.XZ.offset(25.4), keep=Keep.BOTTOM)


with BuildPart() as f1_16:
    add(f1_15.part)

    # F4_t112: union F4_tool113
    add(f4_tool113.part)

    # F6 (on offset) → F7 (cut)
    with BuildSketch(Plane.XZ.offset(25.4)):
        with BuildLine():
            add(Edge.make_bspline(
                [(-19.9538823217, 40.0411081183), (-24.3532913729, 40.0411081183), (-22.1535868473, 32.4211081183), (-19.9538823217, 24.8011081183), (-17.7541777961, 32.4211081183), (-15.5544732705, 40.0411081183), (-19.9538823217, 40.0411081183)],
                knots=[0, 0, 0, 2.0943951024, 2.0943951024, 4.1887902048, 4.1887902048, 6.2831853072, 6.2831853072, 6.2831853072], degree=2, weights=[1, 0.5, 1, 0.5, 1, 0.5, 1]))
        make_face()
        with BuildLine():
            add(Edge.make_bspline(
                [(19.7207042576, 39.9870246475), (15.3212952063, 39.9870246475), (17.5209997319, 32.3670246475), (19.7207042576, 24.7470246475), (21.9204087832, 32.3670246475), (24.1201133088, 39.9870246475), (19.7207042576, 39.9870246475)],
                knots=[0, 0, 0, 2.0943951024, 2.0943951024, 4.1887902048, 4.1887902048, 6.2831853072, 6.2831853072, 6.2831853072], degree=2, weights=[1, 0.5, 1, 0.5, 1, 0.5, 1]))
        make_face()
    extrude(amount=-F7_DEPTH, mode=Mode.SUBTRACT)

    # F8 (on offset) → F9 (cut)
    with BuildSketch(Plane.XZ.offset(25.4)):
        with BuildLine():
            add(Edge.make_bspline(
                [(-19.8178328574, 25.164861232), (-22.6623498561, 22.5631797606), (0.1459036803, 14.7938469787), (36.8441903107, 30.6531948363), (-15.9304937435, 28.7203394206), (-19.8178328574, 25.164861232)],
                knots=[0, 0, 0, 0, 0.297963223, 0.5928011358, 1, 1, 1, 1], degree=3))
        make_face()
    extrude(amount=-F9_DEPTH, mode=Mode.SUBTRACT)

    # F10 (on Right) → F11 (join, two sides)
    with BuildSketch(Plane.YZ) as f11_sk:
        with Locations((-11.1081842333, 63.6173412204)):
            Circle(F10_R)
        with Locations((7.134210784, 63.4367242455)):
            Circle(F10_R)
        with Locations((27.4023022503, 60.3210888803)):
            Circle(F10_R)
        with Locations((31.947221607, 41.8740585446)):
            Circle(F10_R)
        with Locations((31.6798724234, 24.2290720344)):
            Circle(F10_R)
    extrude(amount=F11_DEPTH)
    extrude(f11_sk.sketch, amount=-F11_DEPTH_BACK)


solid = f1_16.part
